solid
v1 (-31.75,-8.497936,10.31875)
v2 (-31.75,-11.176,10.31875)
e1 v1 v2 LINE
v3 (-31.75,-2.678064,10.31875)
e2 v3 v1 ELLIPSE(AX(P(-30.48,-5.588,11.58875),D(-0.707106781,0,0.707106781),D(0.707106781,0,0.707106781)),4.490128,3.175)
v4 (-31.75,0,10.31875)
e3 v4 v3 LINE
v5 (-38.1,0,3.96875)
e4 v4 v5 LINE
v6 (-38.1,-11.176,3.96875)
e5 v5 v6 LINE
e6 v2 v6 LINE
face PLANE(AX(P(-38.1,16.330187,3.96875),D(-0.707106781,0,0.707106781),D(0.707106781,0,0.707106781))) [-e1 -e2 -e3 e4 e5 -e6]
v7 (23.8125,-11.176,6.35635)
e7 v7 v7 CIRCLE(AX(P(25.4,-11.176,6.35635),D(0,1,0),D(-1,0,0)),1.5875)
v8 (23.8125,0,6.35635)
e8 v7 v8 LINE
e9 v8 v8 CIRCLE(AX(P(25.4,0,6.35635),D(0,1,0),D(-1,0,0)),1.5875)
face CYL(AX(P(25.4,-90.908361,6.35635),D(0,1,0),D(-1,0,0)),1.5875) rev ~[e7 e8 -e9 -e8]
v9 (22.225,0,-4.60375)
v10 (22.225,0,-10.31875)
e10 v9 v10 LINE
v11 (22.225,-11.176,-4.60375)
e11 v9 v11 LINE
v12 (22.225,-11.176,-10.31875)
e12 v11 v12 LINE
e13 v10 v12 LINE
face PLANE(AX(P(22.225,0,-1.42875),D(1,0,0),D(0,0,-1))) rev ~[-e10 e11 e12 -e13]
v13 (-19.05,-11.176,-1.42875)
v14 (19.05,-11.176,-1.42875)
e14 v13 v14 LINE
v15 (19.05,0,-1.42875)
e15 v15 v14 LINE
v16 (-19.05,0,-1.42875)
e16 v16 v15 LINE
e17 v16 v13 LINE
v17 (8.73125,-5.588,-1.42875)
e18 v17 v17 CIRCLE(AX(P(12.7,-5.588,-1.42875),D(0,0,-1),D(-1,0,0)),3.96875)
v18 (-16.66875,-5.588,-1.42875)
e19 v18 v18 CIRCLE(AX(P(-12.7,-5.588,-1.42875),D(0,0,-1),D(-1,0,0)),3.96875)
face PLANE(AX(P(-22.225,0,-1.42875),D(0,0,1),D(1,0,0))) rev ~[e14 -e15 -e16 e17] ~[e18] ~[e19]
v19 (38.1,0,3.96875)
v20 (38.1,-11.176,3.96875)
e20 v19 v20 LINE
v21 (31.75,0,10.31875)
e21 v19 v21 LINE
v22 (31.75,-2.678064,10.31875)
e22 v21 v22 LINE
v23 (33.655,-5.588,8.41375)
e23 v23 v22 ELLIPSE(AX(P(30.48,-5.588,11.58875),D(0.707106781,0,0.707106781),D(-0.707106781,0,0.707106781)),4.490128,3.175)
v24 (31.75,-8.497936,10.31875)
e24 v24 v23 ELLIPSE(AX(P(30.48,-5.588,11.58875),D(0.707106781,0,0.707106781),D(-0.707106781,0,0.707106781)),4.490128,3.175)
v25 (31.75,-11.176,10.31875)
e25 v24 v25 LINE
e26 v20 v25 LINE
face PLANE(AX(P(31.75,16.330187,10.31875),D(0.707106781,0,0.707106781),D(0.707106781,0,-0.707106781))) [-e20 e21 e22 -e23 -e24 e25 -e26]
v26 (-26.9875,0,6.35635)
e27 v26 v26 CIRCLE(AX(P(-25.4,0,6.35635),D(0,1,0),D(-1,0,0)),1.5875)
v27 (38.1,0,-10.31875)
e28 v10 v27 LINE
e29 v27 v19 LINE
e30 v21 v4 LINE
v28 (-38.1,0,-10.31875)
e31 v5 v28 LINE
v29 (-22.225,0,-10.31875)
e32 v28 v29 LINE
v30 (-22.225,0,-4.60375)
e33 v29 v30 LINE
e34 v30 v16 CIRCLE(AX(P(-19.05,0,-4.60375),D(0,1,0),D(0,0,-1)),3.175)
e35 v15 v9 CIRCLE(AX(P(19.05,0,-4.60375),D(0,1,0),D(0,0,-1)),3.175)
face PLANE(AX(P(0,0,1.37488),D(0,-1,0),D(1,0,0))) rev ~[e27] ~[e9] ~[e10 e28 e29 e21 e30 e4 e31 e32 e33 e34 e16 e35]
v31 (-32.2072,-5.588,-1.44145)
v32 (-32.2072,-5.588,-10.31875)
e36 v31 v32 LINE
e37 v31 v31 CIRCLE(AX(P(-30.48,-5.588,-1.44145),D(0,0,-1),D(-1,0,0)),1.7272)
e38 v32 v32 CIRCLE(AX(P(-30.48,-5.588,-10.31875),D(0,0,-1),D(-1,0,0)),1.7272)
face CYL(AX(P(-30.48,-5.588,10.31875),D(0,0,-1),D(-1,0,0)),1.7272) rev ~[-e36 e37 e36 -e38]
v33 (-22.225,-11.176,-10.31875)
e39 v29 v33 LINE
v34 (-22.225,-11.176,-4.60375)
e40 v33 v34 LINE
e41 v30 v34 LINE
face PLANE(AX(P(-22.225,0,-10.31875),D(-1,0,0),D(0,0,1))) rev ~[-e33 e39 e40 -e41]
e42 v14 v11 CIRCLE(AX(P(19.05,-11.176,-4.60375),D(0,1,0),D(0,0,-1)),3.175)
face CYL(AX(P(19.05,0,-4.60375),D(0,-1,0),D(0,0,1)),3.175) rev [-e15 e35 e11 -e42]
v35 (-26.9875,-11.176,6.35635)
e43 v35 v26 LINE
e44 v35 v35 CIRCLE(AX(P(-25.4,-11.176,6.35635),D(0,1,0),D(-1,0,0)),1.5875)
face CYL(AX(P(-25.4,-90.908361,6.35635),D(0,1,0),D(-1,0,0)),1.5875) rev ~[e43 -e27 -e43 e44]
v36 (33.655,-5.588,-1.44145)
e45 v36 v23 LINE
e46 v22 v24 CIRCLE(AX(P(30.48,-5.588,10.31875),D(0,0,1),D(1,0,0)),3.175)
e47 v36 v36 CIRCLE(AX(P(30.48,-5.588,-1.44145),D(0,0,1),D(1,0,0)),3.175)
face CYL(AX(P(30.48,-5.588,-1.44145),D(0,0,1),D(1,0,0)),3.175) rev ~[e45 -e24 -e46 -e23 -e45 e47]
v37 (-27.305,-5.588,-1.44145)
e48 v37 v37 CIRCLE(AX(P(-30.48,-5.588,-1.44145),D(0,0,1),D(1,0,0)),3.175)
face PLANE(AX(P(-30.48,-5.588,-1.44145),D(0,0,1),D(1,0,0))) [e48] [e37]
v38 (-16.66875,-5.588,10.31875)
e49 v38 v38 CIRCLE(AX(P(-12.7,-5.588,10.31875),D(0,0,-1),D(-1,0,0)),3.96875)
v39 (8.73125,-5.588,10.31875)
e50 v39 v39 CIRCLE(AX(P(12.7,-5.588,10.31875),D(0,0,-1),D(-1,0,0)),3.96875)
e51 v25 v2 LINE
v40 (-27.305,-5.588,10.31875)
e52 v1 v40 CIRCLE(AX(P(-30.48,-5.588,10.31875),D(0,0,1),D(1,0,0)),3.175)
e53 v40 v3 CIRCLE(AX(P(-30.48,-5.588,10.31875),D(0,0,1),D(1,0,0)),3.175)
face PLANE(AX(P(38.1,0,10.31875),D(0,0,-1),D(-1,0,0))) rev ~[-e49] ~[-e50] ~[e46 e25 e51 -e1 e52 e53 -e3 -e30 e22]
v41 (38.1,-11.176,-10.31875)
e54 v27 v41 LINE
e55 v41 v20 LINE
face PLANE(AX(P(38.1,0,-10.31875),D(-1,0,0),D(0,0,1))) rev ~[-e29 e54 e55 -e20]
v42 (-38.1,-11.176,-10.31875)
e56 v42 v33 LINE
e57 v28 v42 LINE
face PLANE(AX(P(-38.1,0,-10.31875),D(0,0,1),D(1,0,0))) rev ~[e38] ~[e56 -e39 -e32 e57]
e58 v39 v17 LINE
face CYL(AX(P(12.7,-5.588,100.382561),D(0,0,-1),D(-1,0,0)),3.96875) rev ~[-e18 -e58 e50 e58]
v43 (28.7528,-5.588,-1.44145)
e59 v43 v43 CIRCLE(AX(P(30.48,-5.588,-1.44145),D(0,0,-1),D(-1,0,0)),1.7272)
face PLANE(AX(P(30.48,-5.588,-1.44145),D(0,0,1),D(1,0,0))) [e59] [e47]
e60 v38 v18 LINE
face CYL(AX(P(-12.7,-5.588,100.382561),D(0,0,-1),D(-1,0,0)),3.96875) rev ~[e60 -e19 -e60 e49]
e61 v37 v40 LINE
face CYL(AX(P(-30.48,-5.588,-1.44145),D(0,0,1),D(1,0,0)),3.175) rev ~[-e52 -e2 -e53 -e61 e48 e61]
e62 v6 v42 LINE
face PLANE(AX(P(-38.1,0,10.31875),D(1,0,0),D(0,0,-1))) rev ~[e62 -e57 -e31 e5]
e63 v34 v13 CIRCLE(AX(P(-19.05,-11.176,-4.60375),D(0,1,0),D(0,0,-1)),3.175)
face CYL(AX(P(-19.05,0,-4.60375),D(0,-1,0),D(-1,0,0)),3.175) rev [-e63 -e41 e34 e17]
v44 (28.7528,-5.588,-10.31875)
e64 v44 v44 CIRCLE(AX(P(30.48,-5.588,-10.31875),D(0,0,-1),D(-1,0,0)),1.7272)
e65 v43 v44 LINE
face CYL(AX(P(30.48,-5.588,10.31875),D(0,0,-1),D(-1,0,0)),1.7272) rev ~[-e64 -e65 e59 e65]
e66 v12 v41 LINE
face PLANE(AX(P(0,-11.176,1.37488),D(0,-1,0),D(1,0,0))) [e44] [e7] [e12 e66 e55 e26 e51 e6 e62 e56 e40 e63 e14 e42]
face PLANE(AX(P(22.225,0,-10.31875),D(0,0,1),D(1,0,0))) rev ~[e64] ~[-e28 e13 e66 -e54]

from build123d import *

# Parameters (mm, degrees)
F1_DEPTH       = 11.176
F2_R           = 3.175
F5_D           = 3.4544
F5_START       = 10.33145
F5_CBORE_D     = 6.35
F5_CBORE_DEPTH = 11.7602
F6_T1_DEPTH    = 43.8363739472
F8_D           = 7.9375
F10_D          = 3.175


# Not quite as in the source:
# - a fillet or chamfer that OpenCascade refuses, or shapes differently, is made with other operations: its cross-section is extruded or revolved along the edge and cut away or added


with BuildPart() as f1:
    # F0 (on Front) → F1 (new body)
    with BuildSketch(Plane.XZ):
        Polygon((38.1, 10.31875), (-38.1, 10.31875), (-38.1, -10.31875), (-22.225, -10.31875), (-22.225, -1.42875), (22.225, -1.42875), (22.225, -10.31875), (38.1, -10.31875), align=None)
    extrude(amount=F1_DEPTH)

    # F2
    f2_edges = [f1.edges().sort_by_distance(p)[0] for p in [
        (-22.225, -5.588, -1.42875),
        (22.225, -5.588, -1.42875),
    ]]
    fillet(f2_edges, radius=F2_R)

    # F5 (through all)
    # its depths count from where the whole tool has entered the part; down to there all is cleared
    with Locations(Plane.XY.offset(20.6502).offset(-F5_START)):
        with Locations((-30.48, -5.588), (30.48, -5.588)):
            CounterBoreHole(F5_D / 2, F5_CBORE_D / 2, F5_CBORE_DEPTH)

    # F6: chamfer of 6.35 on 2 edges, made by hand

    # F6_s2 → F6_t1 (cut)
    with BuildSketch(Plane.XZ.offset(-16.3301869736)):
        Polygon((-38.1, 3.96875), (-31.75, 10.31875), (-38.1, 10.31875), align=None)
        Polygon((31.75, 10.31875), (38.1, 3.96875), (38.1, 10.31875), align=None)
    extrude(amount=F6_T1_DEPTH, mode=Mode.SUBTRACT)

    # F8 (through all)
    with Locations(Plane.XY.offset(20.6502)):
        with Locations((-12.7, -5.588), (12.7, -5.588)):
            Hole(F8_D / 2)

    # F10 (through all)
    with Locations(Plane.XZ.offset(11.176)):
        with Locations((-25.4, 6.35635), (25.4, 6.35635)):
            Hole(F10_D / 2)


solid = f1.part
